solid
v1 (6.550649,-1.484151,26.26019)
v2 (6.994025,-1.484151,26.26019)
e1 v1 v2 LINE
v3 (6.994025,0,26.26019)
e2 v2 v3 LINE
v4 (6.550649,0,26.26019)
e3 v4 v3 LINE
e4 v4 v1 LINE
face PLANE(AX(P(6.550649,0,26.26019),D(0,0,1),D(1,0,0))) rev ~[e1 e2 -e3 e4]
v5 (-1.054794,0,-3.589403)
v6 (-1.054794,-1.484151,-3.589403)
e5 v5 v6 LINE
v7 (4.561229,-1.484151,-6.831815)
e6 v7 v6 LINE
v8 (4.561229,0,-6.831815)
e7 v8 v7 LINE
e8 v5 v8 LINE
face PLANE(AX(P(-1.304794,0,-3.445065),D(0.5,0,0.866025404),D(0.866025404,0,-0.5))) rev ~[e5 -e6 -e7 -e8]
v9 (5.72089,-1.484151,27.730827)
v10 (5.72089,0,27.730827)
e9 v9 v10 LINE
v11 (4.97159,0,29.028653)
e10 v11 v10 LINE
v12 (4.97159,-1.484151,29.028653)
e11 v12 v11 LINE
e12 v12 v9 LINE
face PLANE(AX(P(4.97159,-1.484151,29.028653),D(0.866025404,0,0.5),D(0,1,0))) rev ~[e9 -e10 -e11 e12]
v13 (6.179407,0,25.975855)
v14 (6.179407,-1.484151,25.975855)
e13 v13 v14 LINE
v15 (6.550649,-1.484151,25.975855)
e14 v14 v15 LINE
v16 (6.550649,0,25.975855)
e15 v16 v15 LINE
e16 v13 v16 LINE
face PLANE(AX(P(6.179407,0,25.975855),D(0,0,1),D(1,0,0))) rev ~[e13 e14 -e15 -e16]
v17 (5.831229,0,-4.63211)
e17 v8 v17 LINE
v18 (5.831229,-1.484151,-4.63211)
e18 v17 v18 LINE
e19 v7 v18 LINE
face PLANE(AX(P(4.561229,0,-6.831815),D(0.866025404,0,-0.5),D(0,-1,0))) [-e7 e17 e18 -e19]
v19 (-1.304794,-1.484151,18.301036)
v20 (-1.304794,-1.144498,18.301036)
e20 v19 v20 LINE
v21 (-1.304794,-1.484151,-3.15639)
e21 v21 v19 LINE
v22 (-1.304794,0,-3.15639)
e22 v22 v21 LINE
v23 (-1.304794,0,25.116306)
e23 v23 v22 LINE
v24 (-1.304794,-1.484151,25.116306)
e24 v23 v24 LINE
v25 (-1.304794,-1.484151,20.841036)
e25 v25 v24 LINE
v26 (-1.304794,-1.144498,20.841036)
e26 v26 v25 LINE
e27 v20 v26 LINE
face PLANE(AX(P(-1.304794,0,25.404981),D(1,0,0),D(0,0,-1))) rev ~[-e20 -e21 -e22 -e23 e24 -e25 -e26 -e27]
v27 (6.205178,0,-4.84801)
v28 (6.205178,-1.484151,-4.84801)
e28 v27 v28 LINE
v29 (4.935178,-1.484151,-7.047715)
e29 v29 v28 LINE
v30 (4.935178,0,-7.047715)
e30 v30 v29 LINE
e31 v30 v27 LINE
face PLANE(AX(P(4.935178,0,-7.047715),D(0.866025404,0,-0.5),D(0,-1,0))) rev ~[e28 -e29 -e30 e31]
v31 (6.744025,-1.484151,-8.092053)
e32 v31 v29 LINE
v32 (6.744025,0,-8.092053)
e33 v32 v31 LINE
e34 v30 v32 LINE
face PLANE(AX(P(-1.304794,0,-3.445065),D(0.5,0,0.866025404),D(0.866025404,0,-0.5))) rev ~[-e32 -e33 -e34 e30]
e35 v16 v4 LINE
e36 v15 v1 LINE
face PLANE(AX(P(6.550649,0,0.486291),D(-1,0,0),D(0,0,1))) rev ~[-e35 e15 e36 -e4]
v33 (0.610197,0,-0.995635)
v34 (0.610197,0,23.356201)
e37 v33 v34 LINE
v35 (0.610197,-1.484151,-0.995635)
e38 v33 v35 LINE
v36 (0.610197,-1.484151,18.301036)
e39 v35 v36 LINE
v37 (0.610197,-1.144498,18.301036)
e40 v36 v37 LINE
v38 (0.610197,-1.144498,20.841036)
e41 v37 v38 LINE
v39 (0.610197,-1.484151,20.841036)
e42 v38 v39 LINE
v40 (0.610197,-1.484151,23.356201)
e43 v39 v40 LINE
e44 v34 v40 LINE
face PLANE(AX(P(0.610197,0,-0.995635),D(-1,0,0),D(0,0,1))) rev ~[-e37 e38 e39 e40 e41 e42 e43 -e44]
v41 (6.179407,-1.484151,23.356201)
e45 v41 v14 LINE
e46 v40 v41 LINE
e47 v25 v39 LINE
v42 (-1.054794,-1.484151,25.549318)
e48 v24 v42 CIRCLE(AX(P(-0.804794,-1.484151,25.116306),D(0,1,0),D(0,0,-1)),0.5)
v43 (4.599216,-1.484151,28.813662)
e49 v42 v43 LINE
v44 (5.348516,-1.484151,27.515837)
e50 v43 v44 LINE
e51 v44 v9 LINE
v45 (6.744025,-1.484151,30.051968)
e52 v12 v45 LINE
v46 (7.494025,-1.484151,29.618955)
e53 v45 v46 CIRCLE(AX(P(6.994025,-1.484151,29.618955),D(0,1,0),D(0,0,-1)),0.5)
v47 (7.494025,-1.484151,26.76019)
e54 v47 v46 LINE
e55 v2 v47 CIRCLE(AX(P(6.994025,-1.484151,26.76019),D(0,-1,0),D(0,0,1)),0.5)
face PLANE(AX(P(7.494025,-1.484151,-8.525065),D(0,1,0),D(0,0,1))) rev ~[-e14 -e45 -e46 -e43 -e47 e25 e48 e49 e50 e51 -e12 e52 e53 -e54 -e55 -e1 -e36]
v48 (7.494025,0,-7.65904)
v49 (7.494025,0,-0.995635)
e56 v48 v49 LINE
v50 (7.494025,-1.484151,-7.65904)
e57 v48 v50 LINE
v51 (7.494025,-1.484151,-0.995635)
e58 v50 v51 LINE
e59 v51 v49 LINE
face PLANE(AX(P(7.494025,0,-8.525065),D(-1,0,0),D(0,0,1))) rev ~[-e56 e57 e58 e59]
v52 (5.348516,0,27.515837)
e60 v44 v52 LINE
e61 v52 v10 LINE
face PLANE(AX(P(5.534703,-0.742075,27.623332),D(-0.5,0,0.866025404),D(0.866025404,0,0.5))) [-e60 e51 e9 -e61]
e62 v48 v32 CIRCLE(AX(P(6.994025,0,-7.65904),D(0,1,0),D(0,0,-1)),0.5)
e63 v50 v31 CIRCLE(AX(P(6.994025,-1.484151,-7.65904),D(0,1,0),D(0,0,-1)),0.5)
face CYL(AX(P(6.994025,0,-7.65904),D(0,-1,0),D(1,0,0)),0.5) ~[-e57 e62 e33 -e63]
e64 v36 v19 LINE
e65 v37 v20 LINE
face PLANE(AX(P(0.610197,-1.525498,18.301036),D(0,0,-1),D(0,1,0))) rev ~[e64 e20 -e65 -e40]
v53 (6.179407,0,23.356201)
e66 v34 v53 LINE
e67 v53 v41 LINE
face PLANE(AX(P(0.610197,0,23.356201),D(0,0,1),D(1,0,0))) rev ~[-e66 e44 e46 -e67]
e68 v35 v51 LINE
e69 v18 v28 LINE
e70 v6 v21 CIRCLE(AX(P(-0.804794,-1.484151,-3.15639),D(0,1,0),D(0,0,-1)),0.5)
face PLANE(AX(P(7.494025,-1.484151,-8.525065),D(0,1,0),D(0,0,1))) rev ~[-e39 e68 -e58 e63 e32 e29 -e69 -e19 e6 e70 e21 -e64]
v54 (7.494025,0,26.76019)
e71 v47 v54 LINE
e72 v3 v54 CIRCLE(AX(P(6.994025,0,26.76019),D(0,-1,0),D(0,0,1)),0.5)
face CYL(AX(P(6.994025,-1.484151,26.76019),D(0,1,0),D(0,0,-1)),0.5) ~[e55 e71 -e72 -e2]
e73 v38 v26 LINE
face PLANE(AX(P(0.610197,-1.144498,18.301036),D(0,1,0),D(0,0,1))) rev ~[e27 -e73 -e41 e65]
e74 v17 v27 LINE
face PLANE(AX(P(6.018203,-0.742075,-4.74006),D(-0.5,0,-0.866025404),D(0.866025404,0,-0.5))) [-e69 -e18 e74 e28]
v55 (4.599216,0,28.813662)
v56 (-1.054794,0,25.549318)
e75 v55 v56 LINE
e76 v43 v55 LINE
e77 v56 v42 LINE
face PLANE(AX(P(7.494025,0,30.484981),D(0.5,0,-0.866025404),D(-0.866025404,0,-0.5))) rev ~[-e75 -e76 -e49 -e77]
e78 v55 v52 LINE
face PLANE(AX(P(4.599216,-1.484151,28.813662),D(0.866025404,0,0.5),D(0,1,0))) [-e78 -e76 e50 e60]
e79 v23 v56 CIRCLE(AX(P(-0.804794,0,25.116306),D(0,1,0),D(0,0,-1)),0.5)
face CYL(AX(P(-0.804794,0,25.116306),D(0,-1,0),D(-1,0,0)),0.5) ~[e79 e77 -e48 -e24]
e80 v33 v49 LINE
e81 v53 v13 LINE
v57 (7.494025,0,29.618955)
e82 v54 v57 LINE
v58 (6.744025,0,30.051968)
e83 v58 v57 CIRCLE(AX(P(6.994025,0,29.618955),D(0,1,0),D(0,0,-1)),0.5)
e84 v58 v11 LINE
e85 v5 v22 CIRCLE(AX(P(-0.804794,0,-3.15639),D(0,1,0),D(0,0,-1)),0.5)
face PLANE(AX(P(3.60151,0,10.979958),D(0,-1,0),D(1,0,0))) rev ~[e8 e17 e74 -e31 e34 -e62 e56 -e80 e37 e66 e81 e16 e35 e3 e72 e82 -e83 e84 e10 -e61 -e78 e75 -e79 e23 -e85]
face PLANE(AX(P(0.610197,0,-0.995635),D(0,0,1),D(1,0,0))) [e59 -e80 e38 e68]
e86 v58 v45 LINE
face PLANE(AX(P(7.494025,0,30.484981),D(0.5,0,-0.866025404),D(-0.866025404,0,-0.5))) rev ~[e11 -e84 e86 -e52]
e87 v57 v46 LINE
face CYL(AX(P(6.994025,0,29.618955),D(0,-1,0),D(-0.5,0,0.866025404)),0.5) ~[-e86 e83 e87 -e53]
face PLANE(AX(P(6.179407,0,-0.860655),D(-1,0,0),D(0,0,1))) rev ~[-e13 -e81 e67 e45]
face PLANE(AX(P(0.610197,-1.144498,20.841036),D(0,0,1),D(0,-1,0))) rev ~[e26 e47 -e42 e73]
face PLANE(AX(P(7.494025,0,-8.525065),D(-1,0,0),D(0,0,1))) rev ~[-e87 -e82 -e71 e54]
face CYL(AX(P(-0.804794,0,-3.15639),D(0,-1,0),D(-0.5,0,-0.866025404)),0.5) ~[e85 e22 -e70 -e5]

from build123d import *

# Parameters (mm, degrees)
F1_DEPTH  = 16.1798
F2_W      = 14.6956490017
F2_H      = 39.0100460752
F3_DEPTH  = 25.4
F4_W      = 7.289106492
F4_H      = 24.3518359493
F5_DEPTH  = 6.0198
F6_W      = 0.4318
F6_H      = 1.4841509983
F7_DEPTH  = 2.54
F8_W      = 1.707770396
F8_H      = 26.8365105148
F9_DEPTH  = 5.8674
F10_W     = 4.3080397882
F10_H     = 25.773898873
F11_DEPTH = 8.382
F12_W     = 0.4299804568
F12_H     = 1.4841509983
F13_DEPTH = 1.4986
F14_W     = 0.3396534594
F14_H     = 2.54
F14_W_2   = 0.0413465406
F15_DEPTH = 25.4
F16_R     = 0.5


with BuildPart() as f1:
    # F0 (on Front) → F1 (new body)
    with BuildSketch(Plane.XZ):
        Polygon((7.4940245816, -8.5250653475), (7.4940245816, 30.4849807278), (-1.3047935208, 25.4049807278), (-1.3047935208, -3.4450653475), align=None)
    extrude(amount=F1_DEPTH)

    # F2 (on face) → F3 (cut)
    with BuildSketch(Plane.YZ.offset(7.4940245816)):
        with Locations((-8.8319754991, 10.9799576901)):
            Rectangle(F2_W, F2_H)
    extrude(amount=-F3_DEPTH, mode=Mode.SUBTRACT)

    # F4 (on face) → F5 (cut)
    with BuildSketch(Plane.XZ):
        with Locations((4.2547506746, 11.1802831525)):
            Rectangle(F4_W, F4_H)
    extrude(amount=F5_DEPTH, mode=Mode.SUBTRACT)

    # F6 (on face) → F7 (cut)
    with BuildSketch(Plane(origin=(-1.8179554345, 0, -3.1487911785), x_dir=(0.8660254038, 0, -0.5), z_dir=(-0.5, 0, -0.8660254038))):
        with Locations((7.5819472408, 0.7420754991)):
            Rectangle(F6_W, F6_H)
    extrude(amount=-F7_DEPTH, mode=Mode.SUBTRACT)

    # F8 (on Front) → F9 (cut)
    with BuildSketch(Plane.XZ):
        with Locations((7.0332919713, 12.55759981)):
            Rectangle(F8_W, F8_H)
    extrude(amount=F9_DEPTH, mode=Mode.SUBTRACT)

    # F10 (on Front) → F11 (cut)
    with BuildSketch(Plane.XZ):
        with Locations((8.7046686094, 13.3732402755)):
            Rectangle(F10_W, F10_H)
    extrude(amount=F11_DEPTH, mode=Mode.SUBTRACT)

    # F12 (on face) → F13 (cut)
    with BuildSketch(Plane(origin=(-11.3268777267, 0, 19.6187277137), x_dir=(0.8660254038, 0, 0.5), z_dir=(-0.5, 0, 0.8660254038))):
        with Locations((18.6048597097, -0.7420754991)):
            Rectangle(F12_W, F12_H)
    extrude(amount=-F13_DEPTH, mode=Mode.SUBTRACT)

    # F14 (on face) → F15 (cut)
    with BuildSketch(Plane.YZ.offset(0.6101974286)):
        with Locations((-1.3143242686, 19.5710362089)):
            Rectangle(F14_W, F14_H)
        with Locations((-1.5048242686, 19.5710362089)):
            Rectangle(F14_W_2, F14_H)
    extrude(amount=-F15_DEPTH, mode=Mode.SUBTRACT)

    # F16
    f16_edges = [f1.edges().sort_by_distance(p)[0] for p in [
        (7.494025, -0.742075, 30.484981),
        (7.494025, -0.742075, -8.525065),
        (-1.304794, -0.742075, -3.445065),
        (-1.304794, -0.742075, 25.404981),
        (7.494025, -0.742075, 26.26019),
    ]]
    fillet(f16_edges, radius=F16_R)


solid = f1.part
